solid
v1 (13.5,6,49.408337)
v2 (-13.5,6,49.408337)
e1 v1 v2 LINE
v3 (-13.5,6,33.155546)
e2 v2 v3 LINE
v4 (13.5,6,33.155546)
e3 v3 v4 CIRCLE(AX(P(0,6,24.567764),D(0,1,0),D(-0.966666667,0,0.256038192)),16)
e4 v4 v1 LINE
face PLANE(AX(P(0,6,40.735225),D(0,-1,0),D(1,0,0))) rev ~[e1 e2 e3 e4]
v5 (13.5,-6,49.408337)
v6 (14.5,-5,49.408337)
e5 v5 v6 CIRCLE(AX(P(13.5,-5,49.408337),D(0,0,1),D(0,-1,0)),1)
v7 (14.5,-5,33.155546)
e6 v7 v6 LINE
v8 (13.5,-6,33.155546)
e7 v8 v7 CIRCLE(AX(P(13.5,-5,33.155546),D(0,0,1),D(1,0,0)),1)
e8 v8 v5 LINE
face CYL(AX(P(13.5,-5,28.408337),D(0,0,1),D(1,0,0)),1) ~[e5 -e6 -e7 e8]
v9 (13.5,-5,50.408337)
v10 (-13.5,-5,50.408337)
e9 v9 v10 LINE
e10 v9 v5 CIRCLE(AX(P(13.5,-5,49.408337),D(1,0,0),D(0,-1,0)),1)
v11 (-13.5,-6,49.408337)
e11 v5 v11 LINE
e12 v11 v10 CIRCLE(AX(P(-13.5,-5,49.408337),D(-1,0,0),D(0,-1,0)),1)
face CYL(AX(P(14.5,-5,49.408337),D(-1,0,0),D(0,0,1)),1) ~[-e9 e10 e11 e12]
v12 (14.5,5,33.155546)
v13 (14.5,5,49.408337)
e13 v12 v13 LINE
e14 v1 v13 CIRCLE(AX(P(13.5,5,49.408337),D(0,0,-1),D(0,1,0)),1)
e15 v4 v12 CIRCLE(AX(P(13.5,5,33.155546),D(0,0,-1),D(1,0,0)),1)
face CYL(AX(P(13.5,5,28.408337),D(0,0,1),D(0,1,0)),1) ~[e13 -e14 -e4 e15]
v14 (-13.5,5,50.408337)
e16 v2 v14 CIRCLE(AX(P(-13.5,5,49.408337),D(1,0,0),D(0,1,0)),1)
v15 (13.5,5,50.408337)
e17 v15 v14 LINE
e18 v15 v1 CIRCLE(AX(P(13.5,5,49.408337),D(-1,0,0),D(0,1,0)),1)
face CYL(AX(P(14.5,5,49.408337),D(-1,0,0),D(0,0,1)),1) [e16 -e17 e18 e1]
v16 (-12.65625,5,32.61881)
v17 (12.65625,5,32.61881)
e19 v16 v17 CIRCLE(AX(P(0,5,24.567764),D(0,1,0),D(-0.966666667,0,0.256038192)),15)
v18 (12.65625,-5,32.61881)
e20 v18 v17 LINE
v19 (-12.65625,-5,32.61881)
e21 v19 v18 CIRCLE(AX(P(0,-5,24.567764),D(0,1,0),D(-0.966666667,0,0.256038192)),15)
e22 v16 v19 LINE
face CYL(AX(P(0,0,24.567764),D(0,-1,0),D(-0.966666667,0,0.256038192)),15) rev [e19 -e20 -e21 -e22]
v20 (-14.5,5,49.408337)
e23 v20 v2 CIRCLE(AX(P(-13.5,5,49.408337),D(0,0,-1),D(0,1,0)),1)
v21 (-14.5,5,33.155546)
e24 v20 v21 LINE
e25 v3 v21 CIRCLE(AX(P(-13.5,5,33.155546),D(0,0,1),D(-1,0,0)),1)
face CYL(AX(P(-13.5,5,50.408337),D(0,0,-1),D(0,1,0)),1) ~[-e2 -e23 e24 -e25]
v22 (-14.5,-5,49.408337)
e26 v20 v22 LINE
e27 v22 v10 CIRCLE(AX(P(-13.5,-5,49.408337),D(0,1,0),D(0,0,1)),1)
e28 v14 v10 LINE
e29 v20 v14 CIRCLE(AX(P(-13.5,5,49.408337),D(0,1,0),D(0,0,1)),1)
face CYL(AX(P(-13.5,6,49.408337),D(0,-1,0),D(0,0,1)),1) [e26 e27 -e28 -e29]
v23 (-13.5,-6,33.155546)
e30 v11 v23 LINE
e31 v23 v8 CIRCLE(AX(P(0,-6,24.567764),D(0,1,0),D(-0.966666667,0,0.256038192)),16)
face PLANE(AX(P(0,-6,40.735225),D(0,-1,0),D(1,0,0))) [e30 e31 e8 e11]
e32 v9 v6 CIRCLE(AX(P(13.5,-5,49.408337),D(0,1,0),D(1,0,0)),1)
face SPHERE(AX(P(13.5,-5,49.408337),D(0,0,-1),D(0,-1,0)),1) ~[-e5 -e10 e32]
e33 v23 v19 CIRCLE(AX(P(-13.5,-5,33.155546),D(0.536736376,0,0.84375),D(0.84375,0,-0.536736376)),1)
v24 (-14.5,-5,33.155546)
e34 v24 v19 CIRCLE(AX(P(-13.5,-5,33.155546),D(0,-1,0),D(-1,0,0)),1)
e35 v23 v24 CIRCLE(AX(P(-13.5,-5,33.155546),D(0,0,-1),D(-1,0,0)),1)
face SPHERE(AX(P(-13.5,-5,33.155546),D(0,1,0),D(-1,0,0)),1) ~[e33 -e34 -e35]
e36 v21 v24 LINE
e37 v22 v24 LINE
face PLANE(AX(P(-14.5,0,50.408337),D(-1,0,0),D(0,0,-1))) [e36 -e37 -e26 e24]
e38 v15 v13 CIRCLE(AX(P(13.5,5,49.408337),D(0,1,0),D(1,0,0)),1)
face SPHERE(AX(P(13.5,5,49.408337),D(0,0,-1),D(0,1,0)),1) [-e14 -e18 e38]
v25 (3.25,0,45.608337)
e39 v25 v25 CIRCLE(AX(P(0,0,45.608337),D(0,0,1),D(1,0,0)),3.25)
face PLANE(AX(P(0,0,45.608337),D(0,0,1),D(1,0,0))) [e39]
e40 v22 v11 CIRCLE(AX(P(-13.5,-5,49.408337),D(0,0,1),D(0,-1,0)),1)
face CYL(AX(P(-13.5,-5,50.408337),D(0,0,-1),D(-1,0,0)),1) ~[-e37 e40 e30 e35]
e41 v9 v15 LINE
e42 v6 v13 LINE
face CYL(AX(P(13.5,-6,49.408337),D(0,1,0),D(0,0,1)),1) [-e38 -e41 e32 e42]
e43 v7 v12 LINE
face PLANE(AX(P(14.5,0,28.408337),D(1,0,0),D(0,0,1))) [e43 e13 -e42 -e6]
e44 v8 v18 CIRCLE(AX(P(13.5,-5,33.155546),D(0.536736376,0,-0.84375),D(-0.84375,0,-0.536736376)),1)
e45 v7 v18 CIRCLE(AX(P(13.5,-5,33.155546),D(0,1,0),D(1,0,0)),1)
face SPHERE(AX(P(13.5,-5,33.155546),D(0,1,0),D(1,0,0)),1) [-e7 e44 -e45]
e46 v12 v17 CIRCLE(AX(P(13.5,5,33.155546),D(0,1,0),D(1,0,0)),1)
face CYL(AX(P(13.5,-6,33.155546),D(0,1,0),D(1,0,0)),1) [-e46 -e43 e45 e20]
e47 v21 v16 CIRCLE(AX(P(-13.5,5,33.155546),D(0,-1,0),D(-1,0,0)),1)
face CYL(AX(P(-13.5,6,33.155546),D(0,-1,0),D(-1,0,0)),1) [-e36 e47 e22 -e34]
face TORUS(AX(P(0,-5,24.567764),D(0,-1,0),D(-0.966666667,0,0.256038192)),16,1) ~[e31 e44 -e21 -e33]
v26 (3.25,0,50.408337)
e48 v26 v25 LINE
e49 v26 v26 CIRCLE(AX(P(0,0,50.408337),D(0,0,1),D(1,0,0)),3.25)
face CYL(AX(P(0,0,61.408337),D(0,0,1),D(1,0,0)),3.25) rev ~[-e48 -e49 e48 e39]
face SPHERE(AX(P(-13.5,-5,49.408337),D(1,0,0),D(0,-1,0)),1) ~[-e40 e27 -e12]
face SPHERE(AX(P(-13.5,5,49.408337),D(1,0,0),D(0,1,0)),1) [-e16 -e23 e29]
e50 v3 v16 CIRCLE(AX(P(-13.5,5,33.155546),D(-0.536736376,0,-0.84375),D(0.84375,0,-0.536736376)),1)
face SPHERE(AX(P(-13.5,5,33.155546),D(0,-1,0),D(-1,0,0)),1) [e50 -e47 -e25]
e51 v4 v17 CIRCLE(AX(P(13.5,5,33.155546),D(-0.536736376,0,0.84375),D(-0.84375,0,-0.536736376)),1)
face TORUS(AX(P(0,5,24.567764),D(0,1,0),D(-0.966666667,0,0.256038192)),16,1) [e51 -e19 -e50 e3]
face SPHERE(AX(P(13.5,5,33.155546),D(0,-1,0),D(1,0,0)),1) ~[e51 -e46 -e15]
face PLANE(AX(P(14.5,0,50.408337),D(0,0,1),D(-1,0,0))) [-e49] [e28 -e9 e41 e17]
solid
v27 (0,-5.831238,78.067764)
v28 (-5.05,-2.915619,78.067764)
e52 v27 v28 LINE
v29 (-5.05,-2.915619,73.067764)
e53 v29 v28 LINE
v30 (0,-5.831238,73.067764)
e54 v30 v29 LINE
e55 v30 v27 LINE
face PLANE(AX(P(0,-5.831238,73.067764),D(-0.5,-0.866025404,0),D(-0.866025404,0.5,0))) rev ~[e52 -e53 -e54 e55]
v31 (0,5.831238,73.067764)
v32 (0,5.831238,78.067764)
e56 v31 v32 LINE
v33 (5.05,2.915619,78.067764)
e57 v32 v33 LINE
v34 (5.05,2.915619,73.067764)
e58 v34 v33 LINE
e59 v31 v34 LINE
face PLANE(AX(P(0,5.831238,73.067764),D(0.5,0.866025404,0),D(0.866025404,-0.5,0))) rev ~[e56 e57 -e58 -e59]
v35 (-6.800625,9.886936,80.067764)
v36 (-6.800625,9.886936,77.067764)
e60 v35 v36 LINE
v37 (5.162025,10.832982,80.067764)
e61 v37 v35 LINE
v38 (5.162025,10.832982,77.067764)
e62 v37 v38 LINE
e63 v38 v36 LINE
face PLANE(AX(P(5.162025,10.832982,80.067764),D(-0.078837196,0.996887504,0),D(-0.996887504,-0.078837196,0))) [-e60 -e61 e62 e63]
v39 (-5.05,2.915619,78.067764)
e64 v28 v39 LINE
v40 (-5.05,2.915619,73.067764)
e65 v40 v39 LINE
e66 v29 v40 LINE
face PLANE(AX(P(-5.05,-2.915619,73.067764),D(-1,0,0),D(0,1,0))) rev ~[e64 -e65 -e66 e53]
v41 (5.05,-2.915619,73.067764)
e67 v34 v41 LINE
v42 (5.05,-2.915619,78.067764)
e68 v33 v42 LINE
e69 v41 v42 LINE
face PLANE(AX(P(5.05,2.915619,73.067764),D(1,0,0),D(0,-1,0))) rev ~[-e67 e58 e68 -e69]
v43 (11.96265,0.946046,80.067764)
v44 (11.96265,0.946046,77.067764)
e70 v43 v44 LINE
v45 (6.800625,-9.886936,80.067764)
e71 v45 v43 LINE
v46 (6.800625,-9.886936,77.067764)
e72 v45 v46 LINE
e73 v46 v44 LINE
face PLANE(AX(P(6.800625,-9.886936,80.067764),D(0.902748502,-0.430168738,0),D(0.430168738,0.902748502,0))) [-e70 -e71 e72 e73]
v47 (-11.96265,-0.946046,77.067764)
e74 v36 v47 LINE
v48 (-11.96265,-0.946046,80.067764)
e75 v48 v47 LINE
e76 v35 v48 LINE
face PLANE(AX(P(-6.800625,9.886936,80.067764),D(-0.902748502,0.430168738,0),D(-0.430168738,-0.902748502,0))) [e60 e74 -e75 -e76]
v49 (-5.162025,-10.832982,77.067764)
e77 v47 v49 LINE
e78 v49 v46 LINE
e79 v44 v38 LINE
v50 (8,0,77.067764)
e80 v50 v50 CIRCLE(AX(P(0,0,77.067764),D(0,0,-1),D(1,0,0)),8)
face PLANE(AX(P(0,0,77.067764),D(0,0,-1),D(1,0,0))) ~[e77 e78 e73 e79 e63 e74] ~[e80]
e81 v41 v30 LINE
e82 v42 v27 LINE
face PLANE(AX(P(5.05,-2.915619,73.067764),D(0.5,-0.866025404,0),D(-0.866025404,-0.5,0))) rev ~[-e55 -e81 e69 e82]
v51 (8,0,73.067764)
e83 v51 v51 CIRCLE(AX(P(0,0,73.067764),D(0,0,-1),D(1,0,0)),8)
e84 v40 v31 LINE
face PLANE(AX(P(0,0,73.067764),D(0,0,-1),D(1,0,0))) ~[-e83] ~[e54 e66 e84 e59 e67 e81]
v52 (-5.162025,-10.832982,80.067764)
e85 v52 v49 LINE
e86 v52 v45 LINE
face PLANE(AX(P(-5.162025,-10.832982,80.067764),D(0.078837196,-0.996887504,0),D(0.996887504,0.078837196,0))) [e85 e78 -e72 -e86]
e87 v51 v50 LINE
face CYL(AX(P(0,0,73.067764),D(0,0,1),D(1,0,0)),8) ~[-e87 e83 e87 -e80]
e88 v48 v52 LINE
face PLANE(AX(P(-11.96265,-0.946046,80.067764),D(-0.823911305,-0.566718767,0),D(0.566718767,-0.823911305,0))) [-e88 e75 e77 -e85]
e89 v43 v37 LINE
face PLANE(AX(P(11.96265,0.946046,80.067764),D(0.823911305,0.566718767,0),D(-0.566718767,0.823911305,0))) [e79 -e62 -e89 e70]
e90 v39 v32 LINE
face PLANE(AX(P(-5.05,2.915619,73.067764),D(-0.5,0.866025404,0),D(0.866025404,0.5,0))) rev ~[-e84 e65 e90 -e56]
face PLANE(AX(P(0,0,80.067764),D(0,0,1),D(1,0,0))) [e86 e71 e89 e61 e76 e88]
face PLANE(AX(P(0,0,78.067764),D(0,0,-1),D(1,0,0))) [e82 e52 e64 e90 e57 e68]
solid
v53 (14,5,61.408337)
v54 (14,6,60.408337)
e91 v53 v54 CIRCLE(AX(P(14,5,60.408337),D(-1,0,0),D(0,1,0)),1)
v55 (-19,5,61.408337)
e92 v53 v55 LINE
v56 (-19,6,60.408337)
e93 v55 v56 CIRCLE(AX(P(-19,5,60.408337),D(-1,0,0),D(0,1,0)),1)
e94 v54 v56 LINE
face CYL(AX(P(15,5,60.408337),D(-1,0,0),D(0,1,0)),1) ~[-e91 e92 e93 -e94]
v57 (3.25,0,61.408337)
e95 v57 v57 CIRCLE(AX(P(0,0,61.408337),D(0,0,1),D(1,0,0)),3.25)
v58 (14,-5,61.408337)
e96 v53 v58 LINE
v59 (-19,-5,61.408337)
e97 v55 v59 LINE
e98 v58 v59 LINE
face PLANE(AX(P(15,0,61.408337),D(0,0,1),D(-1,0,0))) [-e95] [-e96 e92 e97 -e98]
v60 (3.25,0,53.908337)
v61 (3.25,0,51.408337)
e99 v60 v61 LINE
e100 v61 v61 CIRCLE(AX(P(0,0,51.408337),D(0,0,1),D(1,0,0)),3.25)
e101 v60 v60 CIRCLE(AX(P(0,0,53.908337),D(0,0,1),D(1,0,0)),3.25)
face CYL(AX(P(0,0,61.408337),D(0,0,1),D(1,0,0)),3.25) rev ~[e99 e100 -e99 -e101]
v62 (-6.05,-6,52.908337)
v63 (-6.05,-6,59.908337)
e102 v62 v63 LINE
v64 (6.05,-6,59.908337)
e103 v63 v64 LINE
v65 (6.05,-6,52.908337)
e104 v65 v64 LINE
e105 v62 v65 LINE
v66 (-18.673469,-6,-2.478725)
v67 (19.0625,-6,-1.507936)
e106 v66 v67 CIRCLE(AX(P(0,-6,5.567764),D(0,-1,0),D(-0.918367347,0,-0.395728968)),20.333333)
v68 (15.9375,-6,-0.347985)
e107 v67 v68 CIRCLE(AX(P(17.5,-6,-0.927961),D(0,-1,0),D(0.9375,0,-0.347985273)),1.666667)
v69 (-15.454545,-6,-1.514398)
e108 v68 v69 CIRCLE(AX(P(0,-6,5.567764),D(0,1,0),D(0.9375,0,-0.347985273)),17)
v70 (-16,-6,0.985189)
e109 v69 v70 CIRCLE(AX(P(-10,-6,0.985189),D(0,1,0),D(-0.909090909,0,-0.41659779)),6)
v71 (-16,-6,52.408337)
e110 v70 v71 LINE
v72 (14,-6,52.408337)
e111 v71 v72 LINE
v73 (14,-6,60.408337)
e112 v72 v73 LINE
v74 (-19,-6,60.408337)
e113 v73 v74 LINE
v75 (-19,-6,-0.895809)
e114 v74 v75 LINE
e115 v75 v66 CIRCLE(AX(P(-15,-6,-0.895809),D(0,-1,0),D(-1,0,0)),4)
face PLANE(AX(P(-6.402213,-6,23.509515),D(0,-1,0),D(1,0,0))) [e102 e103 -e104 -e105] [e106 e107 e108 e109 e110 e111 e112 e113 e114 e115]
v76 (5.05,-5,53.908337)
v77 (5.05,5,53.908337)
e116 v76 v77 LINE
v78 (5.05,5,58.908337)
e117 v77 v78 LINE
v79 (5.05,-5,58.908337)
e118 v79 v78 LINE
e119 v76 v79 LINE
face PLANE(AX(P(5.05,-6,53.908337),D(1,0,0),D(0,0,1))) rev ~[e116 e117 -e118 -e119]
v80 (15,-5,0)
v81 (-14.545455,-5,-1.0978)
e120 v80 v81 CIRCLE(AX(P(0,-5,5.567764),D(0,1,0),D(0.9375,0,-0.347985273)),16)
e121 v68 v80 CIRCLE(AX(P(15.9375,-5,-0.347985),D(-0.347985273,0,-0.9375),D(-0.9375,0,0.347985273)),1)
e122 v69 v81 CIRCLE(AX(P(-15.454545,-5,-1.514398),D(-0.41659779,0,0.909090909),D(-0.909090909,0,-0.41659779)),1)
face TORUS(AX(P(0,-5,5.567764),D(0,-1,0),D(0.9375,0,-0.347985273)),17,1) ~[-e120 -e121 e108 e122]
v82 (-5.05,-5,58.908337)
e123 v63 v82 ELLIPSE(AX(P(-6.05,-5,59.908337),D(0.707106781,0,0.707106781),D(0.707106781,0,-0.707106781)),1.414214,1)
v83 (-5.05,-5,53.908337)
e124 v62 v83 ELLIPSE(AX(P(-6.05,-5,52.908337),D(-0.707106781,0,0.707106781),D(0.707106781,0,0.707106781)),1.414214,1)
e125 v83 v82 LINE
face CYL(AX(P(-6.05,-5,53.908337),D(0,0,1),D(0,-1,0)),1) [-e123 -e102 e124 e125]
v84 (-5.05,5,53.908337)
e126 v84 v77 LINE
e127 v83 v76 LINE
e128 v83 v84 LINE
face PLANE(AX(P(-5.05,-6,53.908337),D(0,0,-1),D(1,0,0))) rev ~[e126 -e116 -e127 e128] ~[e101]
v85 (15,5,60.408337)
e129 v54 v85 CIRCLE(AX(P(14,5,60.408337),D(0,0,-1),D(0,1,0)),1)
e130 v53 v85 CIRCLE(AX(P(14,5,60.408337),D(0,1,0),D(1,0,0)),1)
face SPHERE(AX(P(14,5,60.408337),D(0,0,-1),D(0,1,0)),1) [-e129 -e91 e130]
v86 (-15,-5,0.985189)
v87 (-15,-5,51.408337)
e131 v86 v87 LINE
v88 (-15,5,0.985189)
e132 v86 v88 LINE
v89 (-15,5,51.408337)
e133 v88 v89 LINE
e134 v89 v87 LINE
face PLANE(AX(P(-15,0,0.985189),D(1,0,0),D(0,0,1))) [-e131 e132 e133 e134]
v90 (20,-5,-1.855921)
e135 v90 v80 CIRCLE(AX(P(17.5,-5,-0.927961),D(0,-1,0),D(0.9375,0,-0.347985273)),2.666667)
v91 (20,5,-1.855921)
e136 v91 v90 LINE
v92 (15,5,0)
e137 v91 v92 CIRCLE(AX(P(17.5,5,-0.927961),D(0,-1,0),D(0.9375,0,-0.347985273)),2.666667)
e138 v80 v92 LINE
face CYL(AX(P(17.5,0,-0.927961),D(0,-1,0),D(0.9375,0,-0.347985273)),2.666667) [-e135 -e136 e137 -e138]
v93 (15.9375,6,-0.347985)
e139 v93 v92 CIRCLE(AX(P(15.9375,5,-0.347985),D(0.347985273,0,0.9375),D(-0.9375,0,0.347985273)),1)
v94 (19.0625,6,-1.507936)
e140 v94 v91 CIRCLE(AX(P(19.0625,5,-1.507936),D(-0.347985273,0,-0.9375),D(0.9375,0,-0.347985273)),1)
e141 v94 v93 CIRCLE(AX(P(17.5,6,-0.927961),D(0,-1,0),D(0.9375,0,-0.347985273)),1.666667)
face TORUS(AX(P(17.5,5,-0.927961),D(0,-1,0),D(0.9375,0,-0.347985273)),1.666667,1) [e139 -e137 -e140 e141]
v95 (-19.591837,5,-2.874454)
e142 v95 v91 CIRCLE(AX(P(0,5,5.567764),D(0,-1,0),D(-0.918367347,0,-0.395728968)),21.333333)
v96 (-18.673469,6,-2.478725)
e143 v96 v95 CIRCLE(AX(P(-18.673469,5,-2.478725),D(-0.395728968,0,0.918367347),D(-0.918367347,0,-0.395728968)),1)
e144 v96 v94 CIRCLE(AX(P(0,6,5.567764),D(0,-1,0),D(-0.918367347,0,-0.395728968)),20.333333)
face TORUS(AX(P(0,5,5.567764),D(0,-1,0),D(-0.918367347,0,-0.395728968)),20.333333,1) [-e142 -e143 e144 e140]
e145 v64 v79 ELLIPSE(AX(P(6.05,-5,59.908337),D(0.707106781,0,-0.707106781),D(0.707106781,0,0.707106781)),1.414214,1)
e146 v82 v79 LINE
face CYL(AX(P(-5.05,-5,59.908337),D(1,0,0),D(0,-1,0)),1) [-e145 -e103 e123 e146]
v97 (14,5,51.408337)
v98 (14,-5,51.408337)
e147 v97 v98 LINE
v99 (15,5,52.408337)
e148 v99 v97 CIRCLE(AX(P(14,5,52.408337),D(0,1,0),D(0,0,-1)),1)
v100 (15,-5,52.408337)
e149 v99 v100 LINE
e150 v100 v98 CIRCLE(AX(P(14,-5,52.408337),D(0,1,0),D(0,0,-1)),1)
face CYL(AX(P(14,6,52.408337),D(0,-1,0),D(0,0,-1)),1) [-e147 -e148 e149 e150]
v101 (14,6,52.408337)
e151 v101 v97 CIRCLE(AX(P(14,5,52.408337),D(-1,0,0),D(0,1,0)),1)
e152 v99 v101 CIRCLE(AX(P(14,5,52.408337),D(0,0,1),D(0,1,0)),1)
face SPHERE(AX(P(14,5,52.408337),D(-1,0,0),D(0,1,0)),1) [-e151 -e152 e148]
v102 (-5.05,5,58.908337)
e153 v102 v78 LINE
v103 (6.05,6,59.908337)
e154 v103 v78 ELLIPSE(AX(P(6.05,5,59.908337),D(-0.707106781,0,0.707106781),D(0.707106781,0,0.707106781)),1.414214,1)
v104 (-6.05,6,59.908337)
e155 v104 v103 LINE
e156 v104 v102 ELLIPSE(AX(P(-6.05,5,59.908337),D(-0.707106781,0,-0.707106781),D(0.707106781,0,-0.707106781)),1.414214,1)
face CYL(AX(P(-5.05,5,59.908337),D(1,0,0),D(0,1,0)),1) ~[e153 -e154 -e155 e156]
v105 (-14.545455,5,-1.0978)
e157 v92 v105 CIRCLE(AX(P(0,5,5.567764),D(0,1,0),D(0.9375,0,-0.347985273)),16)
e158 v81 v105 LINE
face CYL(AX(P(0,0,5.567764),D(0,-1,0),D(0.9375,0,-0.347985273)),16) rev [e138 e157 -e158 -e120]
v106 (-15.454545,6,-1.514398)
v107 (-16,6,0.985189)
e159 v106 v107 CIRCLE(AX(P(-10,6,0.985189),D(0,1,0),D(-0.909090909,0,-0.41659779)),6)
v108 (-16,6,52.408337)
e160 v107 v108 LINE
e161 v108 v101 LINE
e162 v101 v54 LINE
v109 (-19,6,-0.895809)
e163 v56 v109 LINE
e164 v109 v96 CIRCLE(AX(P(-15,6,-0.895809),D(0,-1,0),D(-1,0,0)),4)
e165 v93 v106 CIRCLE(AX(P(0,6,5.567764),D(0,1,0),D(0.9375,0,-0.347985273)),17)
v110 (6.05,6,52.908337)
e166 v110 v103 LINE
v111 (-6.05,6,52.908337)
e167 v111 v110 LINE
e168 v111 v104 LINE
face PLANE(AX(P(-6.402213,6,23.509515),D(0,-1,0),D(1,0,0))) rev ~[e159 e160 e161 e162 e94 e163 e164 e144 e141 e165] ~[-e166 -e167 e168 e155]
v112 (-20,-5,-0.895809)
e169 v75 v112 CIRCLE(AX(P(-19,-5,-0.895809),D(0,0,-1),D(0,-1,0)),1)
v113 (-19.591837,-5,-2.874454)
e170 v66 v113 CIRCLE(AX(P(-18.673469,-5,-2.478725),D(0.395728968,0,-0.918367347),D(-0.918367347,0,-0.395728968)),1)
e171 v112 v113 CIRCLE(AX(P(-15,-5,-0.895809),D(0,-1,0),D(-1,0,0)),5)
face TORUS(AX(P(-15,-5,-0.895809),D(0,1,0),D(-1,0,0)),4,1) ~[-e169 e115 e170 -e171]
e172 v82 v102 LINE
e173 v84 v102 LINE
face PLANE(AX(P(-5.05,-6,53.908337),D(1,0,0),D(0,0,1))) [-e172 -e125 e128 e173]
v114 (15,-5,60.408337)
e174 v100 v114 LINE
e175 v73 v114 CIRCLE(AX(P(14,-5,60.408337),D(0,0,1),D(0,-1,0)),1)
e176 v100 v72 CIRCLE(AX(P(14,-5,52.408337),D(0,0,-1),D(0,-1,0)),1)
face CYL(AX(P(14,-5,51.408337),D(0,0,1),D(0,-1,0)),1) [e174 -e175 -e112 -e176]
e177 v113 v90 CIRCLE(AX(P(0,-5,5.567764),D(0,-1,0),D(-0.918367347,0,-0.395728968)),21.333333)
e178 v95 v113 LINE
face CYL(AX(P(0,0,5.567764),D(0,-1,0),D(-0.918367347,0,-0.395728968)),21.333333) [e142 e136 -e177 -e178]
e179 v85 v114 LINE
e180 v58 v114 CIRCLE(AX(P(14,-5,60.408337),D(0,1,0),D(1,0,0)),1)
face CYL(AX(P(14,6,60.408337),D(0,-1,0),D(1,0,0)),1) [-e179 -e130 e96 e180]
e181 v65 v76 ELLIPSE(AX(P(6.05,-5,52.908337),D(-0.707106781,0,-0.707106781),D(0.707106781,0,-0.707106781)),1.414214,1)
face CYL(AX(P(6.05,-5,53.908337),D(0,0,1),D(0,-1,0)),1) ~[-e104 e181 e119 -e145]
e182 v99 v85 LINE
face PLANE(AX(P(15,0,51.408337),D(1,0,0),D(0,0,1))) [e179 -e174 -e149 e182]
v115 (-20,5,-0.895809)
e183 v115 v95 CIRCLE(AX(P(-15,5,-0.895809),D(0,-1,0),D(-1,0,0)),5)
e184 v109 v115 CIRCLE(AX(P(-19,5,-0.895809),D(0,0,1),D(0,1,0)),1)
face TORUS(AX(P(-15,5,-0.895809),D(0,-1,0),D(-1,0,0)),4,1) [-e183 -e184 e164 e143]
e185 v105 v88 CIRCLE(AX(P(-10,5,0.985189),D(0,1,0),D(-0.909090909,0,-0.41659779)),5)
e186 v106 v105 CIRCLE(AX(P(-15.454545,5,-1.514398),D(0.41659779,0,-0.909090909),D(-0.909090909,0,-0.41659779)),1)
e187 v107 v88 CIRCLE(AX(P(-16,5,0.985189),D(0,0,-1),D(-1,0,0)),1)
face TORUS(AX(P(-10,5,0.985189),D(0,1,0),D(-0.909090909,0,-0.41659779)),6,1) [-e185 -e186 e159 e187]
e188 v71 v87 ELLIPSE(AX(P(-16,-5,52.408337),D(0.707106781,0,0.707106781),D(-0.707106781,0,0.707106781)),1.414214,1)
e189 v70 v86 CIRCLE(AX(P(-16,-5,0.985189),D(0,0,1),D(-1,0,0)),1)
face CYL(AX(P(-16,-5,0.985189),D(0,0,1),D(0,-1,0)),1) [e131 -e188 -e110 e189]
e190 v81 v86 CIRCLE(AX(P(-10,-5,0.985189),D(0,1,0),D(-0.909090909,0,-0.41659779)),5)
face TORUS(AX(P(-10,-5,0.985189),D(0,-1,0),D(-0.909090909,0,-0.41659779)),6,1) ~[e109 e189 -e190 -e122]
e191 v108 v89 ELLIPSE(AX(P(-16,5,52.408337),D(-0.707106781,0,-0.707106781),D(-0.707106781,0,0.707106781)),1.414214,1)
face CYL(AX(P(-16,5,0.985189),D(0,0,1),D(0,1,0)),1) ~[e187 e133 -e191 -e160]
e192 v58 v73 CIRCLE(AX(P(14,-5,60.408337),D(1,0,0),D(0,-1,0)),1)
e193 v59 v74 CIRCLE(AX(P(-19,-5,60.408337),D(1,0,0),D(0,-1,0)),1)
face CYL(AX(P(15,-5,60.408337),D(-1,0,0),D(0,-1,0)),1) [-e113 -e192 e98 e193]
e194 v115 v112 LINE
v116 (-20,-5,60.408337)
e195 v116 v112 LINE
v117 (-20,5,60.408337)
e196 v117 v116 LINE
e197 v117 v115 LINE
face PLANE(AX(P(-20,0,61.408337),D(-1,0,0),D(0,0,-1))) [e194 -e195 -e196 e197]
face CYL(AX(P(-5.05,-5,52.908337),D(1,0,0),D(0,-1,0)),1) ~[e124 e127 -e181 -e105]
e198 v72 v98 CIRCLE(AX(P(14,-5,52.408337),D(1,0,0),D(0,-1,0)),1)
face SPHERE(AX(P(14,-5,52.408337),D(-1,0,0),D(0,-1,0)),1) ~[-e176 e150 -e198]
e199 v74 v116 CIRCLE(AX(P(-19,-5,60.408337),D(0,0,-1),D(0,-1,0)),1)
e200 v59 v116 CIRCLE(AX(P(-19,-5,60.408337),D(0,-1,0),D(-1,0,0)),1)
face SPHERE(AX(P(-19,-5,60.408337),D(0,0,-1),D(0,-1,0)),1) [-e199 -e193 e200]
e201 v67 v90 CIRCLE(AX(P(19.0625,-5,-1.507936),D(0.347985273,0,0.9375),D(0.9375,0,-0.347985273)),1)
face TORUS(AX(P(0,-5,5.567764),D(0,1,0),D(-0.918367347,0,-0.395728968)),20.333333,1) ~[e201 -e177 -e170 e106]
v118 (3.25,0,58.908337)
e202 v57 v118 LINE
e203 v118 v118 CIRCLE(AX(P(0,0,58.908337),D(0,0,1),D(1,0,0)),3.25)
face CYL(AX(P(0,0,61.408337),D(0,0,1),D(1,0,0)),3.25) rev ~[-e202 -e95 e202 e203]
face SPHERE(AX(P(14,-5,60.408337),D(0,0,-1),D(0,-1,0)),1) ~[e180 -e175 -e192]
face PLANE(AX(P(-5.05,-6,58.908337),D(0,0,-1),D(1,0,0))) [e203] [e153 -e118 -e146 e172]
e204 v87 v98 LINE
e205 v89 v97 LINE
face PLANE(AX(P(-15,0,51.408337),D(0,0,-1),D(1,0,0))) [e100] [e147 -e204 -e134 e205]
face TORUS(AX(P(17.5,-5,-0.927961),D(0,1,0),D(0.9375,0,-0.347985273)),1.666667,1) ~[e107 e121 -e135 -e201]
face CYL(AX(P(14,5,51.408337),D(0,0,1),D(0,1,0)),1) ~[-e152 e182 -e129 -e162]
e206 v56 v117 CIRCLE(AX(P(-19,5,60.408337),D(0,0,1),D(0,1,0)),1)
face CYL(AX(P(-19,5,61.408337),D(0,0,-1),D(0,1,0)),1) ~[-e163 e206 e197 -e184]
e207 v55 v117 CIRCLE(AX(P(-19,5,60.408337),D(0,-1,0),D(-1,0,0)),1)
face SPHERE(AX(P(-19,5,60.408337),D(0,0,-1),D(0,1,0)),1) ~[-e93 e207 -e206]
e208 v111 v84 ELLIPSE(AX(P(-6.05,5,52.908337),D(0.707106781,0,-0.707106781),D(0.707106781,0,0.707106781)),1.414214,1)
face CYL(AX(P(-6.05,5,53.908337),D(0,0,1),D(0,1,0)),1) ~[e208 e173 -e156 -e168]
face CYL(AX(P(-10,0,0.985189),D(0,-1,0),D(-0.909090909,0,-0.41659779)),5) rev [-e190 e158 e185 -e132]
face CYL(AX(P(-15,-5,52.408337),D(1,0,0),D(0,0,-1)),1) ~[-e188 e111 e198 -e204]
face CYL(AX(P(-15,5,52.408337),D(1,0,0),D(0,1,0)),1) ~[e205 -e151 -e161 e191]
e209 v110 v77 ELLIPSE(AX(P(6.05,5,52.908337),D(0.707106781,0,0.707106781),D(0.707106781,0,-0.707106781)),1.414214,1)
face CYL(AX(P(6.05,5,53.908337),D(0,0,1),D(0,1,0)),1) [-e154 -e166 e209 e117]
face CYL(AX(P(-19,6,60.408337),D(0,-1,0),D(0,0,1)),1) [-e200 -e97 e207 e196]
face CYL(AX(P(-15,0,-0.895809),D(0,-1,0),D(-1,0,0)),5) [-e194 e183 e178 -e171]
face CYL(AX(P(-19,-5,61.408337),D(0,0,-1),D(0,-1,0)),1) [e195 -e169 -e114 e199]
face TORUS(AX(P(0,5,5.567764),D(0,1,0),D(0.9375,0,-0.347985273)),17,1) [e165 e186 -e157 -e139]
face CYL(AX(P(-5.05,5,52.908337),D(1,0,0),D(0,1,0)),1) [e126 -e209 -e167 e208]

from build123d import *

# Parameters (mm, degrees)
F1_DEPTH  = 6
F3_R      = 3.25
F4_DEPTH  = 15.8
F5_W      = 10.1
F5_H      = 5
F6_DEPTH  = 25
F8_DEPTH  = 5
F10_DEPTH = 12
F12_R     = 1
F12_2_R   = 1


with BuildPart() as f1:
    # F0 (on Front) → F1 (new body, symmetric)
    with BuildSketch(Plane.XZ):
        with BuildLine():
            Line((-15, 0.9851886679), (-15, 51.4083372368))
            Line((-15, 51.4083372368), (15, 51.4083372368))
            Line((15, 51.4083372368), (15, 61.4083372368))
            Line((15, 61.4083372368), (-20, 61.4083372368))
            Line((-20, 61.4083372368), (-20, -0.8958087804))
            ThreePointArc((-20, -0.8958087804), (-19.8968961431, -1.9059613249), (-19.5918367347, -2.8744536202))
            ThreePointArc((-19.5918367347, -2.8744536202), (0.5486358136, -15.7585130867), (20, -1.8559214543))
            ThreePointArc((20, -1.8559214543), (18.4279607271, 1.5720392729), (15, 0))
            ThreePointArc((15, 0), (0.5940911198, -10.4212023249), (-14.5454545455, -1.0978002844))
            ThreePointArc((-14.5454545455, -1.0978002844), (-14.8850421046, -0.0808149139), (-15, 0.9851886679))
        make_face()
    extrude(amount=F1_DEPTH, both=True)


with BuildPart() as f1b:
    # F0 (on Front) → F1, piece 2 (new body, symmetric)
    with BuildSketch(Plane.XZ):
        with BuildLine():
            Line((14.5, 50.4083372368), (-14.5, 50.4083372368))
            Line((-14.5, 50.4083372368), (-14.5, 28.4083372368))
            ThreePointArc((-14.5, 28.4083372368), (0, 39.5677643628), (14.5, 28.4083372368))
            Line((14.5, 28.4083372368), (14.5, 50.4083372368))
        make_face()
    extrude(amount=F1_DEPTH, both=True)


with BuildPart() as f2:
    # F0 (on Front) → F2 (revolve)
    with BuildSketch(Plane.XZ):
        Polygon((12, 80.0677643628), (0, 80.0677643628), (0, 73.0677643628), (8, 73.0677643628), (8, 77.0677643628), (12, 77.0677643628), align=None)
    revolve(axis=Axis((0, 0, 76.5677643628), (0, 0, -1)))

    # F7 (on face) → F8 (cut)
    with BuildSketch(Plane(origin=(0, 0, 73.0677643628), x_dir=(1, 0, 0), z_dir=(0, 0, -1))):
        Polygon((5.05, -2.9156188594), (5.05, 2.9156188594), (0, 5.8312377188), (-5.05, 2.9156188594), (-5.05, -2.9156188594), (0, -5.8312377188), align=None)
    extrude(amount=-F8_DEPTH, mode=Mode.SUBTRACT)


with BuildPart() as f4_tool:
    # F3 (on face) → F4 (new body)
    with BuildSketch(Plane.XY.offset(61.4083372368)):
        Circle(F3_R)
    extrude(amount=-F4_DEPTH)


with BuildPart() as f1_1:
    add(f1.part)

    # F4: cut by f4_tool
    add(f4_tool.part, mode=Mode.SUBTRACT)

    # F5 (on face) → F6 (cut)
    with BuildSketch(Plane.XZ.offset(6)):
        with Locations((0, 56.4083372368)):
            Rectangle(F5_W, F5_H)
    extrude(amount=-F6_DEPTH, mode=Mode.SUBTRACT)

    # F12
    f12_edges = [f1_1.edges().sort_by_distance(p)[0] for p in [
        (-14.885042, -6, -0.080815),
        (0.594091, -6, -10.421202),
        (-15, -6, 26.196763),
        (18.427961, -6, 1.572039),
        (0, -6, 51.408337),
        (0.548636, -6, -15.758513),
        (15, -6, 56.408337),
        (-19.896896, -6, -1.905961),
        (-2.5, -6, 61.408337),
        (-20, -6, 30.256264),
        (0, -6, 58.908337),
        (-5.05, -6, 56.408337),
        (0, -6, 53.908337),
        (5.05, -6, 56.408337),
        (-14.885042, 6, -0.080815),
        (0.594091, 6, -10.421202),
        (-15, 6, 26.196763),
        (18.427961, 6, 1.572039),
        (0, 6, 51.408337),
        (0.548636, 6, -15.758513),
        (15, 6, 56.408337),
        (-19.896896, 6, -1.905961),
        (-2.5, 6, 61.408337),
        (-20, 6, 30.256264),
        (0, 6, 58.908337),
        (-5.05, 6, 56.408337),
        (0, 6, 53.908337),
        (5.05, 6, 56.408337),
        (15, 0, 51.408337),
        (15, 0, 61.408337),
        (-20, 0, 61.408337),
        (-20, 0, -0.895809),
    ]]
    fillet(f12_edges, radius=F12_R)


with BuildPart() as f1b_1:
    add(f1b.part)

    # F4: cut by f4_tool
    add(f4_tool.part, mode=Mode.SUBTRACT)

    # F12#2
    f12_2_edges = [f1b_1.edges().sort_by_distance(p)[0] for p in [
        (14.5, -6, 39.408337),
        (0, -6, 50.408337),
        (-14.5, -6, 39.408337),
        (0, -6, 39.567764),
        (14.5, 6, 39.408337),
        (0, 6, 50.408337),
        (-14.5, 6, 39.408337),
        (0, 6, 39.567764),
        (14.5, 0, 50.408337),
        (14.5, 0, 28.408337),
        (-14.5, 0, 50.408337),
        (-14.5, 0, 28.408337),
    ]]
    fillet(f12_2_edges, radius=F12_2_R)


with BuildPart() as f10:
    # F9 (on face) → F10 (new body)
    with BuildSketch(Plane.XY.offset(80.0677643628)):
        Polygon((11.9626500532, 0.9460463543), (5.1620248506, 10.8329820198), (-6.8006252026, 9.8869356655), (-11.9626500532, -0.9460463543), (-5.1620248506, -10.8329820198), (6.8006252026, -9.8869356655), align=None)
    extrude(amount=-F10_DEPTH)


with BuildPart() as f2_1:
    add(f2.part)

    # F11: intersect F10
    add(f10.part, mode=Mode.INTERSECT)


solid = Compound([f1_1.part, f1b_1.part, f2_1.part])
